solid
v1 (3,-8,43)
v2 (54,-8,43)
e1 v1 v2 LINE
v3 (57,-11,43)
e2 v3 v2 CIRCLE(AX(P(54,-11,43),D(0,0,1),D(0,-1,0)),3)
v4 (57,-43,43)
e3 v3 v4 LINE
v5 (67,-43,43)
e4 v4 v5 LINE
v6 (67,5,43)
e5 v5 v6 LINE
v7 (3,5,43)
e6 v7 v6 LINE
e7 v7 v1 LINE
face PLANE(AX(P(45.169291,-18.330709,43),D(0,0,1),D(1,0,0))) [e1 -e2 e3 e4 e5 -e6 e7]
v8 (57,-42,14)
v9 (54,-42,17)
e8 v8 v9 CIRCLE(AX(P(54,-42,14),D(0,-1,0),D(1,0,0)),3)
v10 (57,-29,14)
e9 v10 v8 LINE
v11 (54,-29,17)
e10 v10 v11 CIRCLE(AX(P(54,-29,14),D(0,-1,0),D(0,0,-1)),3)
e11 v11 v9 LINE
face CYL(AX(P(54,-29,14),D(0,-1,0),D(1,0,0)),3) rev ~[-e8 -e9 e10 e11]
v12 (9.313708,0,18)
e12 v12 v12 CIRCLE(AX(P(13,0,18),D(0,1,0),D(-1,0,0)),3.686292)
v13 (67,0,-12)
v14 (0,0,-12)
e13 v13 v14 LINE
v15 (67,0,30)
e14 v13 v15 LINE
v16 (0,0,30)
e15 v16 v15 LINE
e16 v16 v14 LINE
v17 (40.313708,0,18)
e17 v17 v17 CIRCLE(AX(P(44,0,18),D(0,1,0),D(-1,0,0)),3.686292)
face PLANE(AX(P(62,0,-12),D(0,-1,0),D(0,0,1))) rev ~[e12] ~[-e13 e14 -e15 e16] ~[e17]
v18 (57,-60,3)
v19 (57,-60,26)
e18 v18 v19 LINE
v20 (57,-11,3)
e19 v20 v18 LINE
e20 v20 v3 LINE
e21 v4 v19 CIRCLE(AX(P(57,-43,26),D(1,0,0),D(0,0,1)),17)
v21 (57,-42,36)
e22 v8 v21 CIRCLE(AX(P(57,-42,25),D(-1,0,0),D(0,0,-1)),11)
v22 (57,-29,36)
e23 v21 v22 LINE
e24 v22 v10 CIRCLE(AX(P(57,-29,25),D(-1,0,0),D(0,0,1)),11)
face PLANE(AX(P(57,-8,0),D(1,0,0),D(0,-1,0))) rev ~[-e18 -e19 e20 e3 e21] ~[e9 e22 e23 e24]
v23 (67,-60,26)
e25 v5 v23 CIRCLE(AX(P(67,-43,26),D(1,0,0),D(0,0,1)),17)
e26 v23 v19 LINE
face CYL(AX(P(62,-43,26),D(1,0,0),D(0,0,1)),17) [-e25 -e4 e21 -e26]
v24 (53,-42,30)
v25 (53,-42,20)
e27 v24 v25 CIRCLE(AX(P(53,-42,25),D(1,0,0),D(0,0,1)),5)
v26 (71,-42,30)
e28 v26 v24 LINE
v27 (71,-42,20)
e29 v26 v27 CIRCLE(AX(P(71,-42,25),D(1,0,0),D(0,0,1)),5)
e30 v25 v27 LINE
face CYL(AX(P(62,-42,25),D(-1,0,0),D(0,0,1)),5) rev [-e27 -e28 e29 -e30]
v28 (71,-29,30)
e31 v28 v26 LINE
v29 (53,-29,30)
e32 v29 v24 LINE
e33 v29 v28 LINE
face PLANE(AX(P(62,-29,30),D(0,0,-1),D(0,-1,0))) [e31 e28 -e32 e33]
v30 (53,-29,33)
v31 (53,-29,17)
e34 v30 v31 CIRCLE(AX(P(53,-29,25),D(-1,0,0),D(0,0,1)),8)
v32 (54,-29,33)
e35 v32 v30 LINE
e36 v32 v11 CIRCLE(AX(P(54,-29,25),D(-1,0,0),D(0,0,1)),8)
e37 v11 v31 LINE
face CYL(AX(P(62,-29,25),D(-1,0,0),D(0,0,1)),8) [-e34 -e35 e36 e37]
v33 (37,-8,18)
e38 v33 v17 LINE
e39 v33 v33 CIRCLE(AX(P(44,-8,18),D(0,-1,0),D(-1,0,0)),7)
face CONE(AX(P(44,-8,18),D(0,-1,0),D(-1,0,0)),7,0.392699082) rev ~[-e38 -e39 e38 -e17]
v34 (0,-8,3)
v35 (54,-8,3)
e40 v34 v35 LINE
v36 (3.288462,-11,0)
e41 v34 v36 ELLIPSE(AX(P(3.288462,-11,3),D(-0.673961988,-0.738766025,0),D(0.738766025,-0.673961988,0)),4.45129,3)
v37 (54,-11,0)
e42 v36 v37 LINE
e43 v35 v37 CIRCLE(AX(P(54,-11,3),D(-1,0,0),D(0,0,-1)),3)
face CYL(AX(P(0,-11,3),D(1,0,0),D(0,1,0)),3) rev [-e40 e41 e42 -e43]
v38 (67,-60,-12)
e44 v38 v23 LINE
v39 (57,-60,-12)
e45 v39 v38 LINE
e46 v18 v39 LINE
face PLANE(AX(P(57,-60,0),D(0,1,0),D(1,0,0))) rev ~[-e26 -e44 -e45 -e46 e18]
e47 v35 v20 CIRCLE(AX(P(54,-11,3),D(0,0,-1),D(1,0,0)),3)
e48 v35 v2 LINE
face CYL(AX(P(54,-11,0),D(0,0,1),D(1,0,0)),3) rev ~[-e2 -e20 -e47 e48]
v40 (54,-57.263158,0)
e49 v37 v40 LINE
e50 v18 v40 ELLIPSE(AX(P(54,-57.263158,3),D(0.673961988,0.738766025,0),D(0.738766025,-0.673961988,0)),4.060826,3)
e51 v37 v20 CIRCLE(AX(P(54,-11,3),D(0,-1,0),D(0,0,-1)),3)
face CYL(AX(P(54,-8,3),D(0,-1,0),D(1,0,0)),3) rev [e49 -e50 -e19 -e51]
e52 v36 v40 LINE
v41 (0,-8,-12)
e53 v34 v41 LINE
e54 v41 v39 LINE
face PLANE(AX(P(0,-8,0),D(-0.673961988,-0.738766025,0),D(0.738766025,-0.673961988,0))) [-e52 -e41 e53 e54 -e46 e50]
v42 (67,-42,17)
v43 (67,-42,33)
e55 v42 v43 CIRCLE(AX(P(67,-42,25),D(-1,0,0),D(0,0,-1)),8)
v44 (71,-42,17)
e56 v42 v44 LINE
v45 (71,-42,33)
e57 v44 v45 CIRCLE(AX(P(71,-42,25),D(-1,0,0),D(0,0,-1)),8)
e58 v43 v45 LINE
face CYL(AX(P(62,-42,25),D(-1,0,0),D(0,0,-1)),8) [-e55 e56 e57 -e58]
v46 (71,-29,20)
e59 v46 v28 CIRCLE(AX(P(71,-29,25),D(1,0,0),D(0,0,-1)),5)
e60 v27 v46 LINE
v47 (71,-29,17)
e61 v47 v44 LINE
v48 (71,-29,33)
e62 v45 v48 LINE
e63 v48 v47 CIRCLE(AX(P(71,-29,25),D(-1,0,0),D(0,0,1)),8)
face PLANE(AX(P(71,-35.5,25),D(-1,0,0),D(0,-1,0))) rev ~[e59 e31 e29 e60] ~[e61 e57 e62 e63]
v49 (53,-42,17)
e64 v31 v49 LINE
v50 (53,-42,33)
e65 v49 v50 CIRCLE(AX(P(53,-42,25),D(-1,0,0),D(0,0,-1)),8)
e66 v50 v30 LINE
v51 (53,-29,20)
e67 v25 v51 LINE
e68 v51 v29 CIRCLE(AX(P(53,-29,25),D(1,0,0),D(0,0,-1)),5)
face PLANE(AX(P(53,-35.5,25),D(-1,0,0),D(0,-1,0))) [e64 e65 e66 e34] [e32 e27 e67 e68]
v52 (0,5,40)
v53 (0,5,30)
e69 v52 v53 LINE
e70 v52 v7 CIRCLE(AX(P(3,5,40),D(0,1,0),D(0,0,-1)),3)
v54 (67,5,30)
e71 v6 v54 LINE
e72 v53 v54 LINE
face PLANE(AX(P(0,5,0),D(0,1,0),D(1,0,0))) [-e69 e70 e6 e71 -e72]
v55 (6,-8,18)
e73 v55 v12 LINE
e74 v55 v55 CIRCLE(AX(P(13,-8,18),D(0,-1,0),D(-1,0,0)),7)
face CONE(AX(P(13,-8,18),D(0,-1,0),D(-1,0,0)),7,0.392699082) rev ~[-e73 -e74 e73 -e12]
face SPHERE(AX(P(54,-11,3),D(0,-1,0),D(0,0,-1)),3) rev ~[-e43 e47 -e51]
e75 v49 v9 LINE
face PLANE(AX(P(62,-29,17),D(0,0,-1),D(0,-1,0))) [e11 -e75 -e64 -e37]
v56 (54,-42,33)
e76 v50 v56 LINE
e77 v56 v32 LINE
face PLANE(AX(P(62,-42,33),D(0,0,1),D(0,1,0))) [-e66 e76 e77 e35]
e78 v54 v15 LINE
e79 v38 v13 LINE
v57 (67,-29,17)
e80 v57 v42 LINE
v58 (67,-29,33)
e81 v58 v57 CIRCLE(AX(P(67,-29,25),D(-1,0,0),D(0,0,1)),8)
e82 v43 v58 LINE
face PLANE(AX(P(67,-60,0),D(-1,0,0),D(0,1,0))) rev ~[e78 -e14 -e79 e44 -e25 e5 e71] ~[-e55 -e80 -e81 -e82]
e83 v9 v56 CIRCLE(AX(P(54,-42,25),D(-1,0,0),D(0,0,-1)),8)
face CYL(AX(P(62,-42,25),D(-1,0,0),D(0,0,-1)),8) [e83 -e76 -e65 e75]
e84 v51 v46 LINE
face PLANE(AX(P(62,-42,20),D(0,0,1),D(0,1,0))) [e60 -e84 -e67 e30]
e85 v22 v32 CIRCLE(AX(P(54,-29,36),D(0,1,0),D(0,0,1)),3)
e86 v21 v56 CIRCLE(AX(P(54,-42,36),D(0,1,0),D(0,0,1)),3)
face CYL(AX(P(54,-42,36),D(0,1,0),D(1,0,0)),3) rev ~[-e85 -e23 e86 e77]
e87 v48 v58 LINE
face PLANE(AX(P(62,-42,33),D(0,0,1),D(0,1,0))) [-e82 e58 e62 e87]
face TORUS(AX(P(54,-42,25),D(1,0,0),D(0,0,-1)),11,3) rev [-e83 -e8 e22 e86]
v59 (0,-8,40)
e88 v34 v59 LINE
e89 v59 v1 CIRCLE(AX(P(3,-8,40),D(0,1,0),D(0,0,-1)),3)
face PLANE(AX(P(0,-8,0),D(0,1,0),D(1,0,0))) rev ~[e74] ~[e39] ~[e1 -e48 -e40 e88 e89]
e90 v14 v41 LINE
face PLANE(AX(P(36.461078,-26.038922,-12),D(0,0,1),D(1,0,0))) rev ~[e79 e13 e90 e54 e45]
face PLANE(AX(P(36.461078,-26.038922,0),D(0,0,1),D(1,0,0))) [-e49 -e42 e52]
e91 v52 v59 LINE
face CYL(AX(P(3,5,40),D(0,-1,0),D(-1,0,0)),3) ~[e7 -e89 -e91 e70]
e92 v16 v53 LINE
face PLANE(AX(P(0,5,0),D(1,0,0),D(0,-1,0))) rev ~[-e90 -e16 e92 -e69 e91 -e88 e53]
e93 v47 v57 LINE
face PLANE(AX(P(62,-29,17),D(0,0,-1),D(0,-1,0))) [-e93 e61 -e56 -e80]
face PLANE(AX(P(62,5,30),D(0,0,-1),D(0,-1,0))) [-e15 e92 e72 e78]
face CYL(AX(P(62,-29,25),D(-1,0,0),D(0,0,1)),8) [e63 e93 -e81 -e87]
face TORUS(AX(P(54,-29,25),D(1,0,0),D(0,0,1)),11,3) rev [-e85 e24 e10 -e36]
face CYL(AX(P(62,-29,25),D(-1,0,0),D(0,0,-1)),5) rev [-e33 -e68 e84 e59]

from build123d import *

# Parameters (mm, degrees)
F0_W           = 67
F0_H           = 5
F1_DEPTH       = 12
F2_DEPTH       = 43
F5_DEPTH       = 9
F6_W           = 5
F6_H           = 42
F7_DEPTH       = 100
F9_D           = 5
F9_CSINK_D     = 14
F9_CSINK_ANGLE = 45
F10_R          = 3


# Not quite as in the source:
# - a feature names something its author has since deleted; it is built from what else it names


with BuildPart() as f1:
    # F0 (on Top) → F1 (new body)
    with BuildSketch(Plane.XY):
        Polygon((57, -8), (0, -8), (57, -60), align=None)
        Polygon((67, 0), (0, 0), (0, -8), (57, -8), (57, -60), (67, -60), align=None)
        with Locations((33.5, 2.5)):
            Rectangle(F0_W, F0_H)
    extrude(amount=-F1_DEPTH)

    # F0 (on Top) → F2 (join)
    with BuildSketch(Plane.XY):
        Polygon((67, 0), (0, 0), (0, -8), (57, -8), (57, -60), (67, -60), align=None)
        with Locations((33.5, 2.5)):
            Rectangle(F0_W, F0_H)
    extrude(amount=F2_DEPTH)

    # F4 (on mid) → F5 (join, symmetric)
    with BuildSketch(Plane(origin=(62, 0, 0), x_dir=(0, -1, 0), z_dir=(-1, 0, 0))):
        with BuildLine():
            Line((42, 33), (29, 33))
            ThreePointArc((29, 33), (21, 25), (29, 17))
            Line((29, 17), (42, 17))
            ThreePointArc((42, 17), (50, 25), (42, 33))
        make_face()
        with BuildLine():
            ThreePointArc((42, 30), (47, 25), (42, 20))
            Line((42, 20), (29, 20))
            ThreePointArc((29, 20), (24, 25), (29, 30))
            Line((29, 30), (42, 30))
        make_face(mode=Mode.SUBTRACT)
    extrude(amount=F5_DEPTH, both=True)

    # F6 (on mid) → F7 (cut, symmetric)
    with BuildSketch(Plane(origin=(62, 0, 0), x_dir=(0, -1, 0), z_dir=(-1, 0, 0))):
        with BuildLine():
            ThreePointArc((43, 43), (55.0208152802, 38.0208152802), (60, 26))
            Line((60, 26), (60, 43))
            Line((60, 43), (43, 43))
        make_face()
        with BuildLine():
            Line((42, 30), (29, 30))
            ThreePointArc((29, 30), (24, 25), (29, 20))
            Line((29, 20), (42, 20))
            ThreePointArc((42, 20), (47, 25), (42, 30))
        make_face()
        with Locations((-2.5, 9)):
            Rectangle(F6_W, F6_H)
    extrude(amount=F7_DEPTH, both=True, mode=Mode.SUBTRACT)

    # F9 (through all)
    with Locations(Plane.XZ.offset(8)):
        with Locations((13, 18), (44, 18)):
            CounterSinkHole(F9_D / 2, F9_CSINK_D / 2, counter_sink_angle=F9_CSINK_ANGLE)

    # F10
    f10_edges = [f1.edges().sort_by_distance(p)[0] for p in [
        (57, -21, 25),
        (57, -35.5, 33),
        (57, -34, 0),
        (28.5, -8, 0),
        (57, -8, 21.5),
        (0, -1.5, 43),
    ]]
    fillet(f10_edges, radius=F10_R)


solid = f1.part
